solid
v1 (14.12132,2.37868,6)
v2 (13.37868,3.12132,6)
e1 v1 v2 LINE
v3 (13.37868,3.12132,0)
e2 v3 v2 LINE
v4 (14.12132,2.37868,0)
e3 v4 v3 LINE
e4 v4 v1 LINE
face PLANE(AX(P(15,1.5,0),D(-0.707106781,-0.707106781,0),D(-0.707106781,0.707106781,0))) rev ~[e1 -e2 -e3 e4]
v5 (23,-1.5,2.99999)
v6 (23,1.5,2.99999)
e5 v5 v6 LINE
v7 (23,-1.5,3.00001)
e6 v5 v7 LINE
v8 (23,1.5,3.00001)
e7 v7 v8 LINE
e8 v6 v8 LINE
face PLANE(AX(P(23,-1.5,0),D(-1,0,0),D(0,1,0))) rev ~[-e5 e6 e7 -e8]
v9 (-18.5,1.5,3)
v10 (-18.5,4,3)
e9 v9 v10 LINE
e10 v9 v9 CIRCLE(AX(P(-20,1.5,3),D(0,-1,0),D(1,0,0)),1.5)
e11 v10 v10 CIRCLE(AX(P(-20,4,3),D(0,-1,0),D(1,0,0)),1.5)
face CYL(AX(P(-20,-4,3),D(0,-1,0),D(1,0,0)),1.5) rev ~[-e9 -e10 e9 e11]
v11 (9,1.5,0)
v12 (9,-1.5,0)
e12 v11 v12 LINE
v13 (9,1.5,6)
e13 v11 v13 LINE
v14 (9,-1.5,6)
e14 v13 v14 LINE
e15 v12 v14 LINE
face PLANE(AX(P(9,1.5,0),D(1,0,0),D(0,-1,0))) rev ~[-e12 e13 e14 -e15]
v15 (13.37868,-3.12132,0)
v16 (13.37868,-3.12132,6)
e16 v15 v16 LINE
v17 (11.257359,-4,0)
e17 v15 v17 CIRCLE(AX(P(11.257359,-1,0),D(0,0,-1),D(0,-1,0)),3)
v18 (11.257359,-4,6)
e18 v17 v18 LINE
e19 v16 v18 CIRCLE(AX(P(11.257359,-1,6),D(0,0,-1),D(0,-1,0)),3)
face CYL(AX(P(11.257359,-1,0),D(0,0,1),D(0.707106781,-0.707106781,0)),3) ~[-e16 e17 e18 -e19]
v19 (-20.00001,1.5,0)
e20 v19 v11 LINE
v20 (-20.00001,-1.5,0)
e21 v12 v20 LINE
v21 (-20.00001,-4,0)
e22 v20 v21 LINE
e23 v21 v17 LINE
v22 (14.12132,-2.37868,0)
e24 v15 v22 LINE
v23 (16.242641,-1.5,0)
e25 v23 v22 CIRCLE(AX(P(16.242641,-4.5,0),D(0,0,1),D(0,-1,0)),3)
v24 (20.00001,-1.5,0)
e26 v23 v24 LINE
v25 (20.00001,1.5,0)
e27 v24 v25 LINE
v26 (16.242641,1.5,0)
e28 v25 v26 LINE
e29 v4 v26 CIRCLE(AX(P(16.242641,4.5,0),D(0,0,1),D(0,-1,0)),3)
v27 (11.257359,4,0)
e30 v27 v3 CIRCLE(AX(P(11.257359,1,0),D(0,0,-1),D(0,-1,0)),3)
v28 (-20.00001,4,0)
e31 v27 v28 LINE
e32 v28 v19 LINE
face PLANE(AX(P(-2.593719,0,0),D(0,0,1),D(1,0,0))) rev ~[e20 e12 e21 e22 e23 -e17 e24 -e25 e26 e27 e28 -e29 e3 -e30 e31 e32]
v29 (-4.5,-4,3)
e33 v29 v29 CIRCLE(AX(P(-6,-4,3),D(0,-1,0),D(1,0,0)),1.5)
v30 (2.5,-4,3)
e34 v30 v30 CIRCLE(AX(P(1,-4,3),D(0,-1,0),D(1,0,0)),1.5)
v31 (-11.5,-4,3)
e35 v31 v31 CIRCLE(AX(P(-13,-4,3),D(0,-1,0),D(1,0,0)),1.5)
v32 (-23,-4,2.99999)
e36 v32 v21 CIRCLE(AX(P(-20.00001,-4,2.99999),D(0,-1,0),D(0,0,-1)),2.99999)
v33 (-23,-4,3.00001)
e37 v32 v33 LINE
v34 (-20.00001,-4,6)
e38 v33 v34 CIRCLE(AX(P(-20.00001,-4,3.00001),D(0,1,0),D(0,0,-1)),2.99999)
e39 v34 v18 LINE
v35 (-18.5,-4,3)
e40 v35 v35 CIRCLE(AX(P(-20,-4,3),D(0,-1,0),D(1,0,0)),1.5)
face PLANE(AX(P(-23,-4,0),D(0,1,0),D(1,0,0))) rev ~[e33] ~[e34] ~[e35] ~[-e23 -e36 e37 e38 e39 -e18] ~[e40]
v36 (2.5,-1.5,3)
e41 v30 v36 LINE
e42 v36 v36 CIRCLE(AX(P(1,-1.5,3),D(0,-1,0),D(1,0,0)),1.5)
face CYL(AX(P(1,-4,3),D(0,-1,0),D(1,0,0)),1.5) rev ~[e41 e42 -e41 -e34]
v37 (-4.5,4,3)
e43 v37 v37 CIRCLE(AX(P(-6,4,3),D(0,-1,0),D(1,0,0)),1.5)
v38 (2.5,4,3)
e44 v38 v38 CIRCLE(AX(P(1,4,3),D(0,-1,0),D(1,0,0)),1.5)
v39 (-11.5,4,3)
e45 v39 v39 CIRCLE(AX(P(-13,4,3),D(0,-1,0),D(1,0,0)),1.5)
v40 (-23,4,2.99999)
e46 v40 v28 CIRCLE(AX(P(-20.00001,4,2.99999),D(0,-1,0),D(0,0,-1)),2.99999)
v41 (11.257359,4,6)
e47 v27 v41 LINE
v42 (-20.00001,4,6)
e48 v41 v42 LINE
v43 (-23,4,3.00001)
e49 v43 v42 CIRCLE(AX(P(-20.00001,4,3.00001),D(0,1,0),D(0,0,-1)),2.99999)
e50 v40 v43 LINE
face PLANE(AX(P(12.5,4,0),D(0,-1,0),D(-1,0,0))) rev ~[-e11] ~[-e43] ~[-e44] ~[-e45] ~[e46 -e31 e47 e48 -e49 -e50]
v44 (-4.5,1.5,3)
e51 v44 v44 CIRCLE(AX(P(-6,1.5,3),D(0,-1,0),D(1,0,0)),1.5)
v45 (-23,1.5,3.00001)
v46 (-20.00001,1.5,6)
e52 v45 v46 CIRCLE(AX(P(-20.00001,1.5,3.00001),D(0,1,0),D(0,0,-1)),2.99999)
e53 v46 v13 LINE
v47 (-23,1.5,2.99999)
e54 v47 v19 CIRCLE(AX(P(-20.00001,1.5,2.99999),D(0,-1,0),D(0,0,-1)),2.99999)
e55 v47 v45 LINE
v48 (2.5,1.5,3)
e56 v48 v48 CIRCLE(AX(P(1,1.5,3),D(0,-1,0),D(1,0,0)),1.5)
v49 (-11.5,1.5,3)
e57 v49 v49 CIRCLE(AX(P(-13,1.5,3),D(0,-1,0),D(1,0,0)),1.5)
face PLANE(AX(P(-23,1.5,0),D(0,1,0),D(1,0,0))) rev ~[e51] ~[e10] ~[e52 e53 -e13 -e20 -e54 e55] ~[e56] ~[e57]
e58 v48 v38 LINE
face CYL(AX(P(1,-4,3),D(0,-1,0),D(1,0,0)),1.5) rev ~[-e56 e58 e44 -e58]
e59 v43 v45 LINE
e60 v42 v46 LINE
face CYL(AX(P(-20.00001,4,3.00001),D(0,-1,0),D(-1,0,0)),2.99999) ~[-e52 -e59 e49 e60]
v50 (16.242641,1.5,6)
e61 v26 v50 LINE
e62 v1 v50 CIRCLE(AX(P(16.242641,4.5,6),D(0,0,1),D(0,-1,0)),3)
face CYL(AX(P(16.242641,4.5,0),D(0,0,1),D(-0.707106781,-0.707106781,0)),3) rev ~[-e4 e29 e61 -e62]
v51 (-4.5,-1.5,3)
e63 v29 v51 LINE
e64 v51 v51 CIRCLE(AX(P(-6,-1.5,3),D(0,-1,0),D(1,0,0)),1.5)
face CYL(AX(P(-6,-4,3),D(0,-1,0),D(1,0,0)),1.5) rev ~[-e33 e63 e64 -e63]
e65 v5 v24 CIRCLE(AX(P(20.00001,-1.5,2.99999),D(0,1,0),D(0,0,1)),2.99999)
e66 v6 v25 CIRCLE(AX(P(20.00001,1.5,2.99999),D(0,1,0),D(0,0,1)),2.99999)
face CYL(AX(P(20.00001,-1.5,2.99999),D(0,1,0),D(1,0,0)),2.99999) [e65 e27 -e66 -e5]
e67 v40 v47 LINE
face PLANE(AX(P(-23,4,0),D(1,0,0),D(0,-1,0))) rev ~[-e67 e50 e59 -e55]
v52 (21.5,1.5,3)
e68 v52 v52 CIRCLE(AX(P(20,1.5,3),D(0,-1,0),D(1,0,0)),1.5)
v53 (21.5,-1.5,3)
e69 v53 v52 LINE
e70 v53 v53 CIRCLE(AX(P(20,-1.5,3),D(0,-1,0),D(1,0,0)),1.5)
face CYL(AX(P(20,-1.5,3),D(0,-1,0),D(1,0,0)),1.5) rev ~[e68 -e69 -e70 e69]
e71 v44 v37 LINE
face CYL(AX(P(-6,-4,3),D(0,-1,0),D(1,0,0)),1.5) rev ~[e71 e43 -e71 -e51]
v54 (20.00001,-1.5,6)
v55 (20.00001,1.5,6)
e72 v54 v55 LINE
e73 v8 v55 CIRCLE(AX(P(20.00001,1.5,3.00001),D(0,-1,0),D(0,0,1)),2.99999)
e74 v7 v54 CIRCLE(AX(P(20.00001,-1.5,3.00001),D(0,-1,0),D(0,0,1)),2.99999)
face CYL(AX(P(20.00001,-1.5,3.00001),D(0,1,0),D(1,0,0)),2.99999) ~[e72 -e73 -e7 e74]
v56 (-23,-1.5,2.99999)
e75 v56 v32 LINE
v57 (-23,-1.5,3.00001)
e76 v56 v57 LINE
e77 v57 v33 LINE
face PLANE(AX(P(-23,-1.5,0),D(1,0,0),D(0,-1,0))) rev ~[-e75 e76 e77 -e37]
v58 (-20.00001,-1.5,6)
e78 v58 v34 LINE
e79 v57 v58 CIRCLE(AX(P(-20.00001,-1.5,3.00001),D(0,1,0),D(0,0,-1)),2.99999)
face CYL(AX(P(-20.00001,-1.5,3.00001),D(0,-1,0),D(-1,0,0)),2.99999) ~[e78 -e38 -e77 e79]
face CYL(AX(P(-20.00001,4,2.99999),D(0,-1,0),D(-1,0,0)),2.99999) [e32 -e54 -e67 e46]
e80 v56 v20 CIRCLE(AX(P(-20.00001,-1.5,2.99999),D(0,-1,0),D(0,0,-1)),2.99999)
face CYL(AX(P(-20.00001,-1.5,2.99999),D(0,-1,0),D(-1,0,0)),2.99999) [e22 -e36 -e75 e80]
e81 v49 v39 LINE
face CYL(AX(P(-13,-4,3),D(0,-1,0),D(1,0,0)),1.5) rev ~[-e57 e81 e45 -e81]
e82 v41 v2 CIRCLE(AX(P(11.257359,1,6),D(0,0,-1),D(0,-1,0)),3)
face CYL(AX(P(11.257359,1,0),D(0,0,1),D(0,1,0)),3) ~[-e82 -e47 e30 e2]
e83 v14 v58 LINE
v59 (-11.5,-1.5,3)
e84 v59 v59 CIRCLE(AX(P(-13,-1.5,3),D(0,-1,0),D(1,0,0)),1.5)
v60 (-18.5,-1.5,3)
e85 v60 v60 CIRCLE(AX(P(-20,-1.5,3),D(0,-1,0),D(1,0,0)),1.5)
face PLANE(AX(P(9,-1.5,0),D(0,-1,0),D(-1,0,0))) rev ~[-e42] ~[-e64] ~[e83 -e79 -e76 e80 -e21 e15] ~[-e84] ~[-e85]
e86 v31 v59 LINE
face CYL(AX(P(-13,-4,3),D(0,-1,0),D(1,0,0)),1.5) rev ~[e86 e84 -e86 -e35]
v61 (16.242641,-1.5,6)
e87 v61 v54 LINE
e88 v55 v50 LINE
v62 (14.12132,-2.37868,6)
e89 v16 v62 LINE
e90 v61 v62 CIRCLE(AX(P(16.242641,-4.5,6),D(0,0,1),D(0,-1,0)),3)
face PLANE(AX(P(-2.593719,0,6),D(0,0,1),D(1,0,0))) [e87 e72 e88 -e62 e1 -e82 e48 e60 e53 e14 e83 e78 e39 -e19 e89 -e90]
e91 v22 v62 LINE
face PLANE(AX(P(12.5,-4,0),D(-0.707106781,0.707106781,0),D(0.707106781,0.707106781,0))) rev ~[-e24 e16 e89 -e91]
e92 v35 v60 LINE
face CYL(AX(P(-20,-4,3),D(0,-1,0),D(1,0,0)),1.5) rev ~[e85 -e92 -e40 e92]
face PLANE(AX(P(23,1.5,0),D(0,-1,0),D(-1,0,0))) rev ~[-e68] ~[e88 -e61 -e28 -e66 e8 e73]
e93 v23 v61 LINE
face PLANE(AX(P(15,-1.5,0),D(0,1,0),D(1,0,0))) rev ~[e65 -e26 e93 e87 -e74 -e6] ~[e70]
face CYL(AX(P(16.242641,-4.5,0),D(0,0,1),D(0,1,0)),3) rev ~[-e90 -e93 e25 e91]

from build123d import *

# Parameters (mm, degrees)
F1_DEPTH = 6
F2_R     = 2.99999
F3_R     = 3
F4_R     = 1.5
F5_R     = 1.5
F6_DEPTH = 25


# Not quite as in the source:
# - a fillet or chamfer is up to 0.001 mm smaller than in the source, because OpenCascade refuses the exact size


with BuildPart() as f1:
    # F0 (on Top) → F1 (new body)
    with BuildSketch(Plane.XY):
        Polygon((15, 1.5), (12.5, 4), (-23, 4), (-23, 1.5), (9, 1.5), (9, -1.5), (-23, -1.5), (-23, -4), (12.5, -4), (15, -1.5), (23, -1.5), (23, 1.5), align=None)
    extrude(amount=F1_DEPTH)

    # F2 (radius 3 in the source; OpenCascade refuses exactly that, so slightly less here)
    f2_edges = [f1.edges().sort_by_distance(p)[0] for p in [
        (-23, -2.75, 6),
        (-23, 2.75, 6),
        (23, 0, 6),
        (23, 0, 0),
        (-23, 2.75, 0),
        (-23, -2.75, 0),
    ]]
    fillet(f2_edges, radius=F2_R)

    # F3
    f3_edges = [f1.edges().sort_by_distance(p)[0] for p in [
        (12.5, 4, 3),
        (15, 1.5, 3),
        (15, -1.5, 3),
        (12.5, -4, 3),
    ]]
    fillet(f3_edges, radius=F3_R)

    # F4 (on face) + F5 (on face) → F6 (cut)
    with BuildSketch(Plane.XZ.offset(4)):
        with Locations((-20, 3)):
            Circle(F4_R)
        with Locations((-13, 3)):
            Circle(F4_R)
        with Locations((-6, 3)):
            Circle(F4_R)
        with Locations((1, 3)):
            Circle(F4_R)
    with BuildSketch(Plane.XZ.offset(1.5)):
        with Locations((20, 3)):
            Circle(F5_R)
    extrude(amount=-F6_DEPTH, mode=Mode.SUBTRACT)


solid = f1.part
